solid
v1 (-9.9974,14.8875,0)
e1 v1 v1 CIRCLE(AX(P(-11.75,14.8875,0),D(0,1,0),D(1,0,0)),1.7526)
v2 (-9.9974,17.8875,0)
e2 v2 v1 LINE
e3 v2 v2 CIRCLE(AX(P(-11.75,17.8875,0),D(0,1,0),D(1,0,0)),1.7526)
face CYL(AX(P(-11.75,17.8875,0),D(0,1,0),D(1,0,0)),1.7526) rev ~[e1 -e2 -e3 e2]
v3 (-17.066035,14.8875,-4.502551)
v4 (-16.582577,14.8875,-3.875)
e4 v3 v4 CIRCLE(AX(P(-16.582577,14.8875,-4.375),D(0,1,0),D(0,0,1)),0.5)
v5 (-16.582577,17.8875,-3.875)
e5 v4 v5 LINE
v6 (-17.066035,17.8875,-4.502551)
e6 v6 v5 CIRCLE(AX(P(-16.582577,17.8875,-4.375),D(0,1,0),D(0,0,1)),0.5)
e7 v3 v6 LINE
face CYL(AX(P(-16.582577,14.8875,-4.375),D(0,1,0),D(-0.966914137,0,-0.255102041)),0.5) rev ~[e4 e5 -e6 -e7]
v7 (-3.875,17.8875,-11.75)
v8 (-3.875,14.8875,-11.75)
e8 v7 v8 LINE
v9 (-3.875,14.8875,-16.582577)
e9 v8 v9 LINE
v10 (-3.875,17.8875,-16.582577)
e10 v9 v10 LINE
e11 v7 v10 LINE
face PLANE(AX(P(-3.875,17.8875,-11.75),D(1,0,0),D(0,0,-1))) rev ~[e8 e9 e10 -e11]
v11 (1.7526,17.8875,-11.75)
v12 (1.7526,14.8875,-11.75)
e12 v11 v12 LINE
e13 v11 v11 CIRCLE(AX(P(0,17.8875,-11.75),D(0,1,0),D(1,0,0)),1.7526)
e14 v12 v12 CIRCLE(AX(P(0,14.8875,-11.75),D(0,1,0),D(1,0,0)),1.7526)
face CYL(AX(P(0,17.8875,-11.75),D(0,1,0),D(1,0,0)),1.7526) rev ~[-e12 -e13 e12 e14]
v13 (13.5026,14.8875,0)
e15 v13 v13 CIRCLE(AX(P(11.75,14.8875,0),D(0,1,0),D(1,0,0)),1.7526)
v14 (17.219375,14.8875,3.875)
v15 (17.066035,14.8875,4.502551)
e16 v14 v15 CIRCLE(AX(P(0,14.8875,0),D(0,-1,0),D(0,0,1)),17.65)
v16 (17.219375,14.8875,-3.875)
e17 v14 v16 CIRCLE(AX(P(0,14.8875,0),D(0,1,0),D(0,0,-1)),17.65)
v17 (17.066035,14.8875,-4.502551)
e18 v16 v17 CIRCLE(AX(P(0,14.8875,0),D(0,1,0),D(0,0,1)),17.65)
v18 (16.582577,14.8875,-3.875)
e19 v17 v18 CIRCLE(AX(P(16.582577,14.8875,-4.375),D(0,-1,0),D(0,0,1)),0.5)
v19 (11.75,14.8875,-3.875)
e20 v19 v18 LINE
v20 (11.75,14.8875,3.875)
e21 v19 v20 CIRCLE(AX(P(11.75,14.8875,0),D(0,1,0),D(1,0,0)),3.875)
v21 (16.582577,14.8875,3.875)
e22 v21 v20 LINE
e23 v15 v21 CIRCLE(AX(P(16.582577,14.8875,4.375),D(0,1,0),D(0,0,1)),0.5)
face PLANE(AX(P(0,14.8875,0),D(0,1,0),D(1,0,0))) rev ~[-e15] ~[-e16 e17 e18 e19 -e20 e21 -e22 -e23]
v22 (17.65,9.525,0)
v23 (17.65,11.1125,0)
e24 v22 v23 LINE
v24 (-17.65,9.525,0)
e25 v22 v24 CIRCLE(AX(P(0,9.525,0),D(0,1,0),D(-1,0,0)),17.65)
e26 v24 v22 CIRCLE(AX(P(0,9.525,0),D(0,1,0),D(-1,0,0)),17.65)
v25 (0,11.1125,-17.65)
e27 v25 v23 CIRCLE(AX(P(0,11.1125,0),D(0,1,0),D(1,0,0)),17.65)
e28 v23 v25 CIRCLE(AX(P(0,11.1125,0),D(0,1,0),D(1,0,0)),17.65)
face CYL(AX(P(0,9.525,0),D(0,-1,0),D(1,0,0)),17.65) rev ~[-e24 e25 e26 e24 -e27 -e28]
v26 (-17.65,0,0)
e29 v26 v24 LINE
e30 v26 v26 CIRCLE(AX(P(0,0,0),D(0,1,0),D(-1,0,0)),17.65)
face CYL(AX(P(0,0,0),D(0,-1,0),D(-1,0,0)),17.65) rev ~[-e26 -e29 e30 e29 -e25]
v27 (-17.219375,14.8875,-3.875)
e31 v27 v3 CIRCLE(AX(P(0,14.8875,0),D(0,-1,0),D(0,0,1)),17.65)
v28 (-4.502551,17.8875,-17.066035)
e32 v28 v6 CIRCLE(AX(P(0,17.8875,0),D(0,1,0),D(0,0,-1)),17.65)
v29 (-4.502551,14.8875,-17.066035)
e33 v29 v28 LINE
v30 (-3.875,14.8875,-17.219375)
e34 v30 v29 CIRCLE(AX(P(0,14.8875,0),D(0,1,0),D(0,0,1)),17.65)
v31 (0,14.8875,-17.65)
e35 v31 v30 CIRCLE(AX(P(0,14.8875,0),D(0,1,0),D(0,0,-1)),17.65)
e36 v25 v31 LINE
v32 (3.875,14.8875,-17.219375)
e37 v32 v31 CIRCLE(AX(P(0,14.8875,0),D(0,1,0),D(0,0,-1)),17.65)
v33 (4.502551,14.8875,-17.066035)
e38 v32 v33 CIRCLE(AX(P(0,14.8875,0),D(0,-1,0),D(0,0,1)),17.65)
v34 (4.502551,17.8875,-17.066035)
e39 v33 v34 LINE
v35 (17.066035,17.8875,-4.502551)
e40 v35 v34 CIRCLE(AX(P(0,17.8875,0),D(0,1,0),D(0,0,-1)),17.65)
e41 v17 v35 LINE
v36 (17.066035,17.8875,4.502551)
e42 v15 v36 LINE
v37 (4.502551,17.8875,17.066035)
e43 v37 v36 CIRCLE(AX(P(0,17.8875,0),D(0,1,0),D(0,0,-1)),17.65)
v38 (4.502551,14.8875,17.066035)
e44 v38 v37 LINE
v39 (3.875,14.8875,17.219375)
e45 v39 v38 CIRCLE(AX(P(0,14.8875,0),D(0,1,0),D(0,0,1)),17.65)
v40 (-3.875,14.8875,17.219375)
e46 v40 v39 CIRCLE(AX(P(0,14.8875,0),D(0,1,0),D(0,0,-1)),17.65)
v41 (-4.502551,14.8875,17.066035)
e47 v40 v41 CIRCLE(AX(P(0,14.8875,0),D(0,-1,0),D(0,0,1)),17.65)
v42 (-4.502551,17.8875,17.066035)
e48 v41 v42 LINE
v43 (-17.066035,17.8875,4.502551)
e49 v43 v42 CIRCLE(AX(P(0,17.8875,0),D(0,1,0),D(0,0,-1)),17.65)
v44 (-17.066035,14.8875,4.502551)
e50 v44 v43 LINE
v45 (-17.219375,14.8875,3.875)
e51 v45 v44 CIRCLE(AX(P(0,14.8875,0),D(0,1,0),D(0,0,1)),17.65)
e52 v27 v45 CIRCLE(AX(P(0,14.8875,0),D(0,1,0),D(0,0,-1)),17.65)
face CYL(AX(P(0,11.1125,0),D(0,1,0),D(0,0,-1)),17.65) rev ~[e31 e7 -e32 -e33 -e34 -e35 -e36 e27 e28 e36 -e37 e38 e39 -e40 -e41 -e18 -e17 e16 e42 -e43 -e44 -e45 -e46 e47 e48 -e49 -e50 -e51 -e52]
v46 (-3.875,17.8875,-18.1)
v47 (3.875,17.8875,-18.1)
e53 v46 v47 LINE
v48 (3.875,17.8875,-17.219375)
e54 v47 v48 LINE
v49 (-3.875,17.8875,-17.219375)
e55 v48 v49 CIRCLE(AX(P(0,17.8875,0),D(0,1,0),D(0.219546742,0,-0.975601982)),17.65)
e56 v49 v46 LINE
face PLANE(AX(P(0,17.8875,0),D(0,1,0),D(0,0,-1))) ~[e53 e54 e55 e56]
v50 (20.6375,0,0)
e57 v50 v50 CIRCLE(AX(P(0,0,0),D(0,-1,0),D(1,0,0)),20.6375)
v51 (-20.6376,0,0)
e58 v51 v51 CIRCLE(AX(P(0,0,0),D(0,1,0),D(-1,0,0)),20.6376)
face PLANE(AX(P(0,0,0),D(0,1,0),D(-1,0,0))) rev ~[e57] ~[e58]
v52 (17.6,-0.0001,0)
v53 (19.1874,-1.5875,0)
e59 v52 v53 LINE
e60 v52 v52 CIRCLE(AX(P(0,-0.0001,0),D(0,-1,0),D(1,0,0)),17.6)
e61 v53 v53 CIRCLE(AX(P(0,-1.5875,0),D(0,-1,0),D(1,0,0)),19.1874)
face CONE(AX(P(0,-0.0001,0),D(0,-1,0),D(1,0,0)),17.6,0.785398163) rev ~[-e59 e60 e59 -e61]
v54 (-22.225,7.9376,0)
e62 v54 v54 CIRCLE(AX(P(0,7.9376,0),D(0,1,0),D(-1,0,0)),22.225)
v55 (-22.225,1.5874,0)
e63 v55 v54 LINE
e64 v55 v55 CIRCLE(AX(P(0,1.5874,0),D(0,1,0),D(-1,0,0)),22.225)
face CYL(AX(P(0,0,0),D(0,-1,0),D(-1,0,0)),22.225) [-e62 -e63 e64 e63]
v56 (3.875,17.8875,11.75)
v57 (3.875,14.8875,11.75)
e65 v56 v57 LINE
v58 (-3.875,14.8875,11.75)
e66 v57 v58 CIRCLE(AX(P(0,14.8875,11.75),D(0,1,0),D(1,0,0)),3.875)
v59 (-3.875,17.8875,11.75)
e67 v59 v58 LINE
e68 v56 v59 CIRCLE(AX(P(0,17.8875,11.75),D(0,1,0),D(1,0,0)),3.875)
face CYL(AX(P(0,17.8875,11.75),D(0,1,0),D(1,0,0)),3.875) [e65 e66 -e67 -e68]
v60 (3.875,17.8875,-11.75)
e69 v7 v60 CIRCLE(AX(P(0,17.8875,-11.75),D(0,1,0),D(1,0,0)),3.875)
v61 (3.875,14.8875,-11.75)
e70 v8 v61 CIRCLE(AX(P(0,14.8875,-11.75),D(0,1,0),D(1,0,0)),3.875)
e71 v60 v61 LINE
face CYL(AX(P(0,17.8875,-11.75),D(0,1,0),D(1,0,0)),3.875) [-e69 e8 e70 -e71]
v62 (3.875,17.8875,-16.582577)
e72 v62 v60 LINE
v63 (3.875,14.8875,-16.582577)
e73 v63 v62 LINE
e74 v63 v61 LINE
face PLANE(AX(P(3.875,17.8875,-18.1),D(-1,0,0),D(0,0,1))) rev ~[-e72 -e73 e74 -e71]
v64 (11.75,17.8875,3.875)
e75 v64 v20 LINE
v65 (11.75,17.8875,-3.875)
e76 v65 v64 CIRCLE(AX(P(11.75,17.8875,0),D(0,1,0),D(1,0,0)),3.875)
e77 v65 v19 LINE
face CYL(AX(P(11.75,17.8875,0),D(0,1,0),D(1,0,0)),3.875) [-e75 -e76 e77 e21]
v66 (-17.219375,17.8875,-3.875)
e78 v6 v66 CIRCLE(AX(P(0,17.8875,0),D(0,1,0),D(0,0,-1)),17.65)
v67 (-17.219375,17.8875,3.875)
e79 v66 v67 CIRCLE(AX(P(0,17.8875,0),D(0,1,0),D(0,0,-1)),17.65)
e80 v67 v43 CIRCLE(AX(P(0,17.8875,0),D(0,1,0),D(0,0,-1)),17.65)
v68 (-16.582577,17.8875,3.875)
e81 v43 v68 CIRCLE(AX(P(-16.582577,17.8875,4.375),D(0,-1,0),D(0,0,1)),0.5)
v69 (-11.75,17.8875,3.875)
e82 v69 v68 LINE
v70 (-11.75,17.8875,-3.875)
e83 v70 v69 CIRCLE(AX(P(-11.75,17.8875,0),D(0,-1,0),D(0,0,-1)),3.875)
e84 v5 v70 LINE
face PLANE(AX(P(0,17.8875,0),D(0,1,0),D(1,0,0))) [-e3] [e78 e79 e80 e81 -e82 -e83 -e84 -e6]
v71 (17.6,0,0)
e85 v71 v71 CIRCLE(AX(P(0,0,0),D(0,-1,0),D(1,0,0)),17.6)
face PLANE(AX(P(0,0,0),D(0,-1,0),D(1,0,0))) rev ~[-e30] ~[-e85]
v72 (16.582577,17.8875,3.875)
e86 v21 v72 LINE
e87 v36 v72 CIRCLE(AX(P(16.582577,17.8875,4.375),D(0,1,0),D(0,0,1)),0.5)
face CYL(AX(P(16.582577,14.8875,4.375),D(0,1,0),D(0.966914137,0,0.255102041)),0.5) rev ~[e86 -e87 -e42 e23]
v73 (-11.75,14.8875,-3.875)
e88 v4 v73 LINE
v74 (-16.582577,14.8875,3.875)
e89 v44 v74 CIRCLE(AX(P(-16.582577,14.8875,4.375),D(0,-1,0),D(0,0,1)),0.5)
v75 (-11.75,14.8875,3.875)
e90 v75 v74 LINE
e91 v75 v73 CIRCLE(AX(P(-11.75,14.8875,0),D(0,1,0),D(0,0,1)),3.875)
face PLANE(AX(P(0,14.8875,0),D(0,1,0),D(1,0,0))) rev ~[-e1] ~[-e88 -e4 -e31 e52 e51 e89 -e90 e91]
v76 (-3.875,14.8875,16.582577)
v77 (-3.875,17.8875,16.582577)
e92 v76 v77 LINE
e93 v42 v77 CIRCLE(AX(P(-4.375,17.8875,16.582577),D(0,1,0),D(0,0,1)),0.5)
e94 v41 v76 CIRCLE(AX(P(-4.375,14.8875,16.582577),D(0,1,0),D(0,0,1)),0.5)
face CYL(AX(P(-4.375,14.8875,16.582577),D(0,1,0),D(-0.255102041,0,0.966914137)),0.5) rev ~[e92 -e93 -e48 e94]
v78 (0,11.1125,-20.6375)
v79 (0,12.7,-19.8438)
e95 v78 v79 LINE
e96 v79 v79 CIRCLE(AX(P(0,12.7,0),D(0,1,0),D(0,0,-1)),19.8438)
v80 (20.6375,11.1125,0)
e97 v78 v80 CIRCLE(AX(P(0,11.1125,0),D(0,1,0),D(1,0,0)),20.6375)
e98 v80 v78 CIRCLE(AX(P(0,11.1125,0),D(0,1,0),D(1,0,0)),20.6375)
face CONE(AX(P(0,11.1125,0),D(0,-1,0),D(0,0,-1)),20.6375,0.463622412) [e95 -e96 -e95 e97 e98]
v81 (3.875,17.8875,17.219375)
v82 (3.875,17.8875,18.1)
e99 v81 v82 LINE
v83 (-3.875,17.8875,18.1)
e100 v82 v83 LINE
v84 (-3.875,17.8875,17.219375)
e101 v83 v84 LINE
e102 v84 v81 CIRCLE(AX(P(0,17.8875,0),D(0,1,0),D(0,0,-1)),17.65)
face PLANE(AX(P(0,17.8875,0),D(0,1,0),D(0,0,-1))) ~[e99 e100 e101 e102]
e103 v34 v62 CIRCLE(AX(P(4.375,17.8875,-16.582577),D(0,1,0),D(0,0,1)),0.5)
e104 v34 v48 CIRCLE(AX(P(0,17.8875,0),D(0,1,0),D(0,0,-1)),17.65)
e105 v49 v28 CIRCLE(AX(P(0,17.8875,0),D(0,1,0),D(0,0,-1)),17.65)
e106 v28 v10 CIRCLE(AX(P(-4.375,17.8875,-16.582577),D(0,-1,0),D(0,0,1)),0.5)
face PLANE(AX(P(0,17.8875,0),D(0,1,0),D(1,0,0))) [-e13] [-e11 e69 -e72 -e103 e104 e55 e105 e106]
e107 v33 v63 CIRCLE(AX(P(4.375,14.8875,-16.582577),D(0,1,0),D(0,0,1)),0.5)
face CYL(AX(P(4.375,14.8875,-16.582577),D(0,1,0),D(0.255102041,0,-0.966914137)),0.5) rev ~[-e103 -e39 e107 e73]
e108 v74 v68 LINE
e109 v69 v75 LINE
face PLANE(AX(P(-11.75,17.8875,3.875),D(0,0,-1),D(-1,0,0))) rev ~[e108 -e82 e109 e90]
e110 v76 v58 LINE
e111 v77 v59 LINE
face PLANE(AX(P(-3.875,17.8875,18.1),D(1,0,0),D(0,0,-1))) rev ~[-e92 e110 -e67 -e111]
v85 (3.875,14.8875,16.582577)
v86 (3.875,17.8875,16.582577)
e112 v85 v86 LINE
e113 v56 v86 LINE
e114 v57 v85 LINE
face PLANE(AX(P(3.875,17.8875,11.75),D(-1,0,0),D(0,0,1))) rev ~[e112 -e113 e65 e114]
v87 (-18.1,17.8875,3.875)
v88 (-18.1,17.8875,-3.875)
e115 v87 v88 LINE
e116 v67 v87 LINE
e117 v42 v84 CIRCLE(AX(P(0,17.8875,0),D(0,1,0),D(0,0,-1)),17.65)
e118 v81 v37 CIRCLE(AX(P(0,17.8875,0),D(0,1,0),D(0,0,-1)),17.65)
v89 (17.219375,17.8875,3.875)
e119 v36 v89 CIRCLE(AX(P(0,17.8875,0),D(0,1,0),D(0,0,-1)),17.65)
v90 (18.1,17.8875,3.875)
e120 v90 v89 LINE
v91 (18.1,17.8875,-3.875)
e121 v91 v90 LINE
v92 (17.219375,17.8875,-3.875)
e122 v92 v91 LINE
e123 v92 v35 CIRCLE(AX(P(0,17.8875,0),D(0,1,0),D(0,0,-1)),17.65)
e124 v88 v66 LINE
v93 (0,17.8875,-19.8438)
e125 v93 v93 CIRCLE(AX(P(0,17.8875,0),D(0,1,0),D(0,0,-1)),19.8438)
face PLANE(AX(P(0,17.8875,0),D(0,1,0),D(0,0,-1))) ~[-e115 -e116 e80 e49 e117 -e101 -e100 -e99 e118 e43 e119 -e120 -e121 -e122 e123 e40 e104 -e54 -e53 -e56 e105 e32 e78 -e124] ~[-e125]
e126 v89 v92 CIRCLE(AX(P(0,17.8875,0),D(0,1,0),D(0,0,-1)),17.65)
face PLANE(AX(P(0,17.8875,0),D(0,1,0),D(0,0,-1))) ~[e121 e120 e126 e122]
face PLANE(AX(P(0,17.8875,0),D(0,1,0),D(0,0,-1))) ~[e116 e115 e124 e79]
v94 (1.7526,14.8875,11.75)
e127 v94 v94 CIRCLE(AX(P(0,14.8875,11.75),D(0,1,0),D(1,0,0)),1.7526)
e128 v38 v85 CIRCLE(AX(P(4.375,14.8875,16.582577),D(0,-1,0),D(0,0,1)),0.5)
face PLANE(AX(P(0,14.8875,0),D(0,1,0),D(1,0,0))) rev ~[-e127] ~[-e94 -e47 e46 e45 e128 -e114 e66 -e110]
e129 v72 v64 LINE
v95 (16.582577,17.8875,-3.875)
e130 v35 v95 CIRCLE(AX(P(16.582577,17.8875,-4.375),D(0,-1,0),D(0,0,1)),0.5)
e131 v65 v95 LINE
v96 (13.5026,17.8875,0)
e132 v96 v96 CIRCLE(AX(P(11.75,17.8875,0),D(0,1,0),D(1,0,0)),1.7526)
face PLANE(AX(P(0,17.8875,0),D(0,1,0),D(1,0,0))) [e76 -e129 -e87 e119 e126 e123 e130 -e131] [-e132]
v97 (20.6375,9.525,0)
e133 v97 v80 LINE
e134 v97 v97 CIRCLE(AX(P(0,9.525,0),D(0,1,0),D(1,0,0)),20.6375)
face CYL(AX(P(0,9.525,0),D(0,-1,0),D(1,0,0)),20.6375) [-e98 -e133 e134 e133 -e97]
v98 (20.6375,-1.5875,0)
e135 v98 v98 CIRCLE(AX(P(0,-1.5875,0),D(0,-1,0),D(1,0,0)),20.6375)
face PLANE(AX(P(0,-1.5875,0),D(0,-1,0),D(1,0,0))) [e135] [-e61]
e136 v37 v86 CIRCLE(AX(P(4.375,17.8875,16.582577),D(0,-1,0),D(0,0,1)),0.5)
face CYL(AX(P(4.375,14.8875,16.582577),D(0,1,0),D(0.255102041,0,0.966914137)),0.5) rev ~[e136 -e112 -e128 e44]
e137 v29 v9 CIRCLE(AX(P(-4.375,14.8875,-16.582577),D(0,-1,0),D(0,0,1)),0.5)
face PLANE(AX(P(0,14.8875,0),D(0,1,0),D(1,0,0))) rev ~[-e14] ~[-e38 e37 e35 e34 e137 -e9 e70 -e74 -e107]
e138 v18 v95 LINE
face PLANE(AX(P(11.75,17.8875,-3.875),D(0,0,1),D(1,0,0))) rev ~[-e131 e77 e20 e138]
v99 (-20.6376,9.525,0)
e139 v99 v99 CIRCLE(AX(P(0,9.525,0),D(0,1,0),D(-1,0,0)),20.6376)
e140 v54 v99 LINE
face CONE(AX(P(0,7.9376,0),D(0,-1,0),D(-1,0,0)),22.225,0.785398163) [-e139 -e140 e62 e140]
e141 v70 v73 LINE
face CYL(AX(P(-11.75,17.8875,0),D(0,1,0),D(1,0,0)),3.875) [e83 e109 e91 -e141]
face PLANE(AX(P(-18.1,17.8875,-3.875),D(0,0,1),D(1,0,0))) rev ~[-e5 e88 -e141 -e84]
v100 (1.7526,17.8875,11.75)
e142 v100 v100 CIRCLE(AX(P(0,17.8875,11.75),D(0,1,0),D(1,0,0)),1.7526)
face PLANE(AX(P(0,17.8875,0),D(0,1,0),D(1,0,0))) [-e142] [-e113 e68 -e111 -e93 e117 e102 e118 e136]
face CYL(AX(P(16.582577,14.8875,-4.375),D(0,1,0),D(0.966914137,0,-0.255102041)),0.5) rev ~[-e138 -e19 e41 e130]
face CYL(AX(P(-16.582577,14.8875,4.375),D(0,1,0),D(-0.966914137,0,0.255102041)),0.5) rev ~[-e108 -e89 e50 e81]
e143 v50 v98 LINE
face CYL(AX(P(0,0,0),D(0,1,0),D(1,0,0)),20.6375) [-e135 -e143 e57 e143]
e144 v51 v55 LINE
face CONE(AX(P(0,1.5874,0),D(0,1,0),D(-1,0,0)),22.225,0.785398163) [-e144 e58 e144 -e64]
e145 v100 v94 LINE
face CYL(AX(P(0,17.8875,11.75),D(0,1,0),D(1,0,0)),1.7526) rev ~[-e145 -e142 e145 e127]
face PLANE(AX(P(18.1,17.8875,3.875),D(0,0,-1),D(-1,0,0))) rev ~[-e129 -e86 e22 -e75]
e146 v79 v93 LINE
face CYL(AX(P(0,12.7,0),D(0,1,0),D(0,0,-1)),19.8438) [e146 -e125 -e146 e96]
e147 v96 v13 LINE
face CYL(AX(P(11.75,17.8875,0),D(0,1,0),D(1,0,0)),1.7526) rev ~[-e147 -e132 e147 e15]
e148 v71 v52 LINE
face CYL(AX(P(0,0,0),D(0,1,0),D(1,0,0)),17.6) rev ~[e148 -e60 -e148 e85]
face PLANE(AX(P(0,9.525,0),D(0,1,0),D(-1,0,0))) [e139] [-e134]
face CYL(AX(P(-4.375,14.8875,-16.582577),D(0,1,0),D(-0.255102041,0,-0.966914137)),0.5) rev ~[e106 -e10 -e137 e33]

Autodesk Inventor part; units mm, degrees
ref_plane "YZ Plane" through (0, 0, 0) normal (1, 0, 0) x (0, 1, 0)
ref_plane "XZ Plane" through (0, 0, 0) normal (0, 1, 0) x (-1, 0, 0)
sketch "Sketch1" plane through (0, 0, 0) normal (0, 1, 0) x (-1, 0, 0)
  circle A0 centre (0, 0) radius 22.225 construction
  circle A1 centre (0, 0) radius 17.65
  circle A2 centre (0, 0) radius 22.225
  dimension "d0" = 44.45
  dimension "d1" = 35.3
  dimension "d2" = 44.45
extrude "Extrusion1" add sketch "Sketch1" along normal blind 9.525
sketch "Sketch2" plane through (0, 0, 0) normal (0, -1, 0) x (1, 0, 0)
  circle A0 centre (0, 0) radius 17.6
  circle A1 centre (0, 0) radius 20.6375
  dimension "d5" = 41.275
  dimension "d6" = 35.2
extrude "Extrusion2" add sketch "Sketch2" along normal blind 1.5875
sketch "Sketch3" plane through (0, 9.525, 0) normal (0, 1, 0) x (1, 0, 0)
  circle A0 centre (0, 0) radius 17.65
  circle A1 centre (0, 0) radius 20.6375
  dimension "d9" = 35.3
  dimension "d10" = 41.275
extrude "Extrusion3" add sketch "Sketch3" along normal blind 1.5875
sketch "Sketch4" plane through (0, 0, 0) normal (1, 0, 0) x (0, 1, 0)
  line L0 (11.1125, -17.65) -> (17.8875, -17.65)
  line L1 (17.8875, -17.65) -> (17.8875, -20.6375)
  line L2 (17.8875, -20.6375) -> (11.1125, -20.6375) construction
  line L3 (11.1125, -20.6375) -> (11.1125, -17.65)
  line L4 (11.1125, -20.6375) -> (11.1125, 20.6375) projected
  line L5 (12.7, -17.65) -> (12.7, -20.6375) construction
  line L6 (11.1125, -20.6375) -> (12.7, -19.8438)
  line L7 (12.7, -19.8438) -> (17.8875, -19.8438)
  line L8 (0, 0) -> (25.7056, 0) construction
  line L9 (-11.1125, 0) -> (-11.1125, -19.8438) construction
  line L10 (0, 20.6375) -> (0, -20.6375) projected
  dimension "d13" = 17.65
  dimension "d14" = 20.6375
  dimension "d16" = 1.5875
  dimension "d18" = 19.8438
  dimension "d84" = 11.1125
  dimension "d85" = 29
revolve "Revolution1" add sketch "Sketch4" angle 360 about axis through (0, 0, 0) along (0, 1, 0)
ref_plane "Work Plane1" through (0, 4.7625, 0) normal (0, 1, 0) x (1, 0, 0)
sketch "Sketch11" plane through (0, 17.8875, 0) normal (0, 1, 0) x (1, 0, 0)
  circle A0 centre (0, 0) radius 11.75 construction
  line L0 (0, 0) -> (-11.75, 0) construction
  circle A1 centre (-11.75, 0) radius 3.875
  line L1 (-11.75, -3.875) -> (-18.1, -3.875)
  line L2 (-18.1, -3.875) -> (-18.1, 3.875)
  line L3 (-18.1, 3.875) -> (-11.75, 3.875)
  line L4 (-11.75, 3.875) -> (-11.75, -3.875) construction
  circle A2 centre (0, -11.75) radius 3.875
  line L5 (3.875, -11.75) -> (3.875, -18.1)
  line L6 (3.875, -18.1) -> (-3.875, -18.1)
  line L7 (-3.875, -18.1) -> (-3.875, -11.75)
  line L8 (-3.875, -11.75) -> (3.875, -11.75) construction
  circle A3 centre (11.75, 0) radius 3.875
  line L9 (11.75, 3.875) -> (18.1, 3.875)
  line L10 (18.1, 3.875) -> (18.1, -3.875)
  line L11 (18.1, -3.875) -> (11.75, -3.875)
  line L12 (11.75, -3.875) -> (11.75, 3.875) construction
  circle A4 centre (0, 11.75) radius 3.875
  line L13 (-3.875, 11.75) -> (-3.875, 18.1)
  line L14 (-3.875, 18.1) -> (3.875, 18.1)
  line L15 (3.875, 18.1) -> (3.875, 11.75)
  line L16 (3.875, 11.75) -> (-3.875, 11.75) construction
  circle A5 centre (0, -11.75) radius 1.7526
  circle A6 centre (11.75, 0) radius 1.7526
  circle A7 centre (0, 11.75) radius 1.7526
  circle A8 centre (-11.75, 0) radius 1.7526
  point P0 (3.875, 11.75)
  point P1 (11.75, -3.875)
  point P2 (-3.875, -11.75)
  point P3 (-11.75, 3.875)
  dimension "d121" = 23.5
  dimension "d122" = 7.75
  dimension "d123" = 6.35
  dimension "d126" = 360
  dimension "d134" = 3.5052
  dimension "d137" = 360
extrude "Extrusion10" add sketch "Sketch11" against normal blind 3
fillet "Fillet5" radius 0.5 8 edges at (-17.2194, 16.3875, -3.875) (-17.2194, 16.3875, 3.875) (-3.875, 16.3875, 17.2194) (3.875, 16.3875, 17.2194) (17.2194, 16.3875, -3.875) (17.2194, 16.3875, 3.875) (-3.875, 16.3875, -17.2194) (3.875, 16.3875, -17.2194)
chamfer "Chamfer5" distance 1.5875 angle 45 1 edges at (-17.6, -1.5875, 0)
chamfer "Chamfer6" distance 1.5875 angle 45 2 edges at (22.225, 9.525, 0) (22.225, 0, 0)
properties part number "Motor Hub" material "Nylon 6/6"
